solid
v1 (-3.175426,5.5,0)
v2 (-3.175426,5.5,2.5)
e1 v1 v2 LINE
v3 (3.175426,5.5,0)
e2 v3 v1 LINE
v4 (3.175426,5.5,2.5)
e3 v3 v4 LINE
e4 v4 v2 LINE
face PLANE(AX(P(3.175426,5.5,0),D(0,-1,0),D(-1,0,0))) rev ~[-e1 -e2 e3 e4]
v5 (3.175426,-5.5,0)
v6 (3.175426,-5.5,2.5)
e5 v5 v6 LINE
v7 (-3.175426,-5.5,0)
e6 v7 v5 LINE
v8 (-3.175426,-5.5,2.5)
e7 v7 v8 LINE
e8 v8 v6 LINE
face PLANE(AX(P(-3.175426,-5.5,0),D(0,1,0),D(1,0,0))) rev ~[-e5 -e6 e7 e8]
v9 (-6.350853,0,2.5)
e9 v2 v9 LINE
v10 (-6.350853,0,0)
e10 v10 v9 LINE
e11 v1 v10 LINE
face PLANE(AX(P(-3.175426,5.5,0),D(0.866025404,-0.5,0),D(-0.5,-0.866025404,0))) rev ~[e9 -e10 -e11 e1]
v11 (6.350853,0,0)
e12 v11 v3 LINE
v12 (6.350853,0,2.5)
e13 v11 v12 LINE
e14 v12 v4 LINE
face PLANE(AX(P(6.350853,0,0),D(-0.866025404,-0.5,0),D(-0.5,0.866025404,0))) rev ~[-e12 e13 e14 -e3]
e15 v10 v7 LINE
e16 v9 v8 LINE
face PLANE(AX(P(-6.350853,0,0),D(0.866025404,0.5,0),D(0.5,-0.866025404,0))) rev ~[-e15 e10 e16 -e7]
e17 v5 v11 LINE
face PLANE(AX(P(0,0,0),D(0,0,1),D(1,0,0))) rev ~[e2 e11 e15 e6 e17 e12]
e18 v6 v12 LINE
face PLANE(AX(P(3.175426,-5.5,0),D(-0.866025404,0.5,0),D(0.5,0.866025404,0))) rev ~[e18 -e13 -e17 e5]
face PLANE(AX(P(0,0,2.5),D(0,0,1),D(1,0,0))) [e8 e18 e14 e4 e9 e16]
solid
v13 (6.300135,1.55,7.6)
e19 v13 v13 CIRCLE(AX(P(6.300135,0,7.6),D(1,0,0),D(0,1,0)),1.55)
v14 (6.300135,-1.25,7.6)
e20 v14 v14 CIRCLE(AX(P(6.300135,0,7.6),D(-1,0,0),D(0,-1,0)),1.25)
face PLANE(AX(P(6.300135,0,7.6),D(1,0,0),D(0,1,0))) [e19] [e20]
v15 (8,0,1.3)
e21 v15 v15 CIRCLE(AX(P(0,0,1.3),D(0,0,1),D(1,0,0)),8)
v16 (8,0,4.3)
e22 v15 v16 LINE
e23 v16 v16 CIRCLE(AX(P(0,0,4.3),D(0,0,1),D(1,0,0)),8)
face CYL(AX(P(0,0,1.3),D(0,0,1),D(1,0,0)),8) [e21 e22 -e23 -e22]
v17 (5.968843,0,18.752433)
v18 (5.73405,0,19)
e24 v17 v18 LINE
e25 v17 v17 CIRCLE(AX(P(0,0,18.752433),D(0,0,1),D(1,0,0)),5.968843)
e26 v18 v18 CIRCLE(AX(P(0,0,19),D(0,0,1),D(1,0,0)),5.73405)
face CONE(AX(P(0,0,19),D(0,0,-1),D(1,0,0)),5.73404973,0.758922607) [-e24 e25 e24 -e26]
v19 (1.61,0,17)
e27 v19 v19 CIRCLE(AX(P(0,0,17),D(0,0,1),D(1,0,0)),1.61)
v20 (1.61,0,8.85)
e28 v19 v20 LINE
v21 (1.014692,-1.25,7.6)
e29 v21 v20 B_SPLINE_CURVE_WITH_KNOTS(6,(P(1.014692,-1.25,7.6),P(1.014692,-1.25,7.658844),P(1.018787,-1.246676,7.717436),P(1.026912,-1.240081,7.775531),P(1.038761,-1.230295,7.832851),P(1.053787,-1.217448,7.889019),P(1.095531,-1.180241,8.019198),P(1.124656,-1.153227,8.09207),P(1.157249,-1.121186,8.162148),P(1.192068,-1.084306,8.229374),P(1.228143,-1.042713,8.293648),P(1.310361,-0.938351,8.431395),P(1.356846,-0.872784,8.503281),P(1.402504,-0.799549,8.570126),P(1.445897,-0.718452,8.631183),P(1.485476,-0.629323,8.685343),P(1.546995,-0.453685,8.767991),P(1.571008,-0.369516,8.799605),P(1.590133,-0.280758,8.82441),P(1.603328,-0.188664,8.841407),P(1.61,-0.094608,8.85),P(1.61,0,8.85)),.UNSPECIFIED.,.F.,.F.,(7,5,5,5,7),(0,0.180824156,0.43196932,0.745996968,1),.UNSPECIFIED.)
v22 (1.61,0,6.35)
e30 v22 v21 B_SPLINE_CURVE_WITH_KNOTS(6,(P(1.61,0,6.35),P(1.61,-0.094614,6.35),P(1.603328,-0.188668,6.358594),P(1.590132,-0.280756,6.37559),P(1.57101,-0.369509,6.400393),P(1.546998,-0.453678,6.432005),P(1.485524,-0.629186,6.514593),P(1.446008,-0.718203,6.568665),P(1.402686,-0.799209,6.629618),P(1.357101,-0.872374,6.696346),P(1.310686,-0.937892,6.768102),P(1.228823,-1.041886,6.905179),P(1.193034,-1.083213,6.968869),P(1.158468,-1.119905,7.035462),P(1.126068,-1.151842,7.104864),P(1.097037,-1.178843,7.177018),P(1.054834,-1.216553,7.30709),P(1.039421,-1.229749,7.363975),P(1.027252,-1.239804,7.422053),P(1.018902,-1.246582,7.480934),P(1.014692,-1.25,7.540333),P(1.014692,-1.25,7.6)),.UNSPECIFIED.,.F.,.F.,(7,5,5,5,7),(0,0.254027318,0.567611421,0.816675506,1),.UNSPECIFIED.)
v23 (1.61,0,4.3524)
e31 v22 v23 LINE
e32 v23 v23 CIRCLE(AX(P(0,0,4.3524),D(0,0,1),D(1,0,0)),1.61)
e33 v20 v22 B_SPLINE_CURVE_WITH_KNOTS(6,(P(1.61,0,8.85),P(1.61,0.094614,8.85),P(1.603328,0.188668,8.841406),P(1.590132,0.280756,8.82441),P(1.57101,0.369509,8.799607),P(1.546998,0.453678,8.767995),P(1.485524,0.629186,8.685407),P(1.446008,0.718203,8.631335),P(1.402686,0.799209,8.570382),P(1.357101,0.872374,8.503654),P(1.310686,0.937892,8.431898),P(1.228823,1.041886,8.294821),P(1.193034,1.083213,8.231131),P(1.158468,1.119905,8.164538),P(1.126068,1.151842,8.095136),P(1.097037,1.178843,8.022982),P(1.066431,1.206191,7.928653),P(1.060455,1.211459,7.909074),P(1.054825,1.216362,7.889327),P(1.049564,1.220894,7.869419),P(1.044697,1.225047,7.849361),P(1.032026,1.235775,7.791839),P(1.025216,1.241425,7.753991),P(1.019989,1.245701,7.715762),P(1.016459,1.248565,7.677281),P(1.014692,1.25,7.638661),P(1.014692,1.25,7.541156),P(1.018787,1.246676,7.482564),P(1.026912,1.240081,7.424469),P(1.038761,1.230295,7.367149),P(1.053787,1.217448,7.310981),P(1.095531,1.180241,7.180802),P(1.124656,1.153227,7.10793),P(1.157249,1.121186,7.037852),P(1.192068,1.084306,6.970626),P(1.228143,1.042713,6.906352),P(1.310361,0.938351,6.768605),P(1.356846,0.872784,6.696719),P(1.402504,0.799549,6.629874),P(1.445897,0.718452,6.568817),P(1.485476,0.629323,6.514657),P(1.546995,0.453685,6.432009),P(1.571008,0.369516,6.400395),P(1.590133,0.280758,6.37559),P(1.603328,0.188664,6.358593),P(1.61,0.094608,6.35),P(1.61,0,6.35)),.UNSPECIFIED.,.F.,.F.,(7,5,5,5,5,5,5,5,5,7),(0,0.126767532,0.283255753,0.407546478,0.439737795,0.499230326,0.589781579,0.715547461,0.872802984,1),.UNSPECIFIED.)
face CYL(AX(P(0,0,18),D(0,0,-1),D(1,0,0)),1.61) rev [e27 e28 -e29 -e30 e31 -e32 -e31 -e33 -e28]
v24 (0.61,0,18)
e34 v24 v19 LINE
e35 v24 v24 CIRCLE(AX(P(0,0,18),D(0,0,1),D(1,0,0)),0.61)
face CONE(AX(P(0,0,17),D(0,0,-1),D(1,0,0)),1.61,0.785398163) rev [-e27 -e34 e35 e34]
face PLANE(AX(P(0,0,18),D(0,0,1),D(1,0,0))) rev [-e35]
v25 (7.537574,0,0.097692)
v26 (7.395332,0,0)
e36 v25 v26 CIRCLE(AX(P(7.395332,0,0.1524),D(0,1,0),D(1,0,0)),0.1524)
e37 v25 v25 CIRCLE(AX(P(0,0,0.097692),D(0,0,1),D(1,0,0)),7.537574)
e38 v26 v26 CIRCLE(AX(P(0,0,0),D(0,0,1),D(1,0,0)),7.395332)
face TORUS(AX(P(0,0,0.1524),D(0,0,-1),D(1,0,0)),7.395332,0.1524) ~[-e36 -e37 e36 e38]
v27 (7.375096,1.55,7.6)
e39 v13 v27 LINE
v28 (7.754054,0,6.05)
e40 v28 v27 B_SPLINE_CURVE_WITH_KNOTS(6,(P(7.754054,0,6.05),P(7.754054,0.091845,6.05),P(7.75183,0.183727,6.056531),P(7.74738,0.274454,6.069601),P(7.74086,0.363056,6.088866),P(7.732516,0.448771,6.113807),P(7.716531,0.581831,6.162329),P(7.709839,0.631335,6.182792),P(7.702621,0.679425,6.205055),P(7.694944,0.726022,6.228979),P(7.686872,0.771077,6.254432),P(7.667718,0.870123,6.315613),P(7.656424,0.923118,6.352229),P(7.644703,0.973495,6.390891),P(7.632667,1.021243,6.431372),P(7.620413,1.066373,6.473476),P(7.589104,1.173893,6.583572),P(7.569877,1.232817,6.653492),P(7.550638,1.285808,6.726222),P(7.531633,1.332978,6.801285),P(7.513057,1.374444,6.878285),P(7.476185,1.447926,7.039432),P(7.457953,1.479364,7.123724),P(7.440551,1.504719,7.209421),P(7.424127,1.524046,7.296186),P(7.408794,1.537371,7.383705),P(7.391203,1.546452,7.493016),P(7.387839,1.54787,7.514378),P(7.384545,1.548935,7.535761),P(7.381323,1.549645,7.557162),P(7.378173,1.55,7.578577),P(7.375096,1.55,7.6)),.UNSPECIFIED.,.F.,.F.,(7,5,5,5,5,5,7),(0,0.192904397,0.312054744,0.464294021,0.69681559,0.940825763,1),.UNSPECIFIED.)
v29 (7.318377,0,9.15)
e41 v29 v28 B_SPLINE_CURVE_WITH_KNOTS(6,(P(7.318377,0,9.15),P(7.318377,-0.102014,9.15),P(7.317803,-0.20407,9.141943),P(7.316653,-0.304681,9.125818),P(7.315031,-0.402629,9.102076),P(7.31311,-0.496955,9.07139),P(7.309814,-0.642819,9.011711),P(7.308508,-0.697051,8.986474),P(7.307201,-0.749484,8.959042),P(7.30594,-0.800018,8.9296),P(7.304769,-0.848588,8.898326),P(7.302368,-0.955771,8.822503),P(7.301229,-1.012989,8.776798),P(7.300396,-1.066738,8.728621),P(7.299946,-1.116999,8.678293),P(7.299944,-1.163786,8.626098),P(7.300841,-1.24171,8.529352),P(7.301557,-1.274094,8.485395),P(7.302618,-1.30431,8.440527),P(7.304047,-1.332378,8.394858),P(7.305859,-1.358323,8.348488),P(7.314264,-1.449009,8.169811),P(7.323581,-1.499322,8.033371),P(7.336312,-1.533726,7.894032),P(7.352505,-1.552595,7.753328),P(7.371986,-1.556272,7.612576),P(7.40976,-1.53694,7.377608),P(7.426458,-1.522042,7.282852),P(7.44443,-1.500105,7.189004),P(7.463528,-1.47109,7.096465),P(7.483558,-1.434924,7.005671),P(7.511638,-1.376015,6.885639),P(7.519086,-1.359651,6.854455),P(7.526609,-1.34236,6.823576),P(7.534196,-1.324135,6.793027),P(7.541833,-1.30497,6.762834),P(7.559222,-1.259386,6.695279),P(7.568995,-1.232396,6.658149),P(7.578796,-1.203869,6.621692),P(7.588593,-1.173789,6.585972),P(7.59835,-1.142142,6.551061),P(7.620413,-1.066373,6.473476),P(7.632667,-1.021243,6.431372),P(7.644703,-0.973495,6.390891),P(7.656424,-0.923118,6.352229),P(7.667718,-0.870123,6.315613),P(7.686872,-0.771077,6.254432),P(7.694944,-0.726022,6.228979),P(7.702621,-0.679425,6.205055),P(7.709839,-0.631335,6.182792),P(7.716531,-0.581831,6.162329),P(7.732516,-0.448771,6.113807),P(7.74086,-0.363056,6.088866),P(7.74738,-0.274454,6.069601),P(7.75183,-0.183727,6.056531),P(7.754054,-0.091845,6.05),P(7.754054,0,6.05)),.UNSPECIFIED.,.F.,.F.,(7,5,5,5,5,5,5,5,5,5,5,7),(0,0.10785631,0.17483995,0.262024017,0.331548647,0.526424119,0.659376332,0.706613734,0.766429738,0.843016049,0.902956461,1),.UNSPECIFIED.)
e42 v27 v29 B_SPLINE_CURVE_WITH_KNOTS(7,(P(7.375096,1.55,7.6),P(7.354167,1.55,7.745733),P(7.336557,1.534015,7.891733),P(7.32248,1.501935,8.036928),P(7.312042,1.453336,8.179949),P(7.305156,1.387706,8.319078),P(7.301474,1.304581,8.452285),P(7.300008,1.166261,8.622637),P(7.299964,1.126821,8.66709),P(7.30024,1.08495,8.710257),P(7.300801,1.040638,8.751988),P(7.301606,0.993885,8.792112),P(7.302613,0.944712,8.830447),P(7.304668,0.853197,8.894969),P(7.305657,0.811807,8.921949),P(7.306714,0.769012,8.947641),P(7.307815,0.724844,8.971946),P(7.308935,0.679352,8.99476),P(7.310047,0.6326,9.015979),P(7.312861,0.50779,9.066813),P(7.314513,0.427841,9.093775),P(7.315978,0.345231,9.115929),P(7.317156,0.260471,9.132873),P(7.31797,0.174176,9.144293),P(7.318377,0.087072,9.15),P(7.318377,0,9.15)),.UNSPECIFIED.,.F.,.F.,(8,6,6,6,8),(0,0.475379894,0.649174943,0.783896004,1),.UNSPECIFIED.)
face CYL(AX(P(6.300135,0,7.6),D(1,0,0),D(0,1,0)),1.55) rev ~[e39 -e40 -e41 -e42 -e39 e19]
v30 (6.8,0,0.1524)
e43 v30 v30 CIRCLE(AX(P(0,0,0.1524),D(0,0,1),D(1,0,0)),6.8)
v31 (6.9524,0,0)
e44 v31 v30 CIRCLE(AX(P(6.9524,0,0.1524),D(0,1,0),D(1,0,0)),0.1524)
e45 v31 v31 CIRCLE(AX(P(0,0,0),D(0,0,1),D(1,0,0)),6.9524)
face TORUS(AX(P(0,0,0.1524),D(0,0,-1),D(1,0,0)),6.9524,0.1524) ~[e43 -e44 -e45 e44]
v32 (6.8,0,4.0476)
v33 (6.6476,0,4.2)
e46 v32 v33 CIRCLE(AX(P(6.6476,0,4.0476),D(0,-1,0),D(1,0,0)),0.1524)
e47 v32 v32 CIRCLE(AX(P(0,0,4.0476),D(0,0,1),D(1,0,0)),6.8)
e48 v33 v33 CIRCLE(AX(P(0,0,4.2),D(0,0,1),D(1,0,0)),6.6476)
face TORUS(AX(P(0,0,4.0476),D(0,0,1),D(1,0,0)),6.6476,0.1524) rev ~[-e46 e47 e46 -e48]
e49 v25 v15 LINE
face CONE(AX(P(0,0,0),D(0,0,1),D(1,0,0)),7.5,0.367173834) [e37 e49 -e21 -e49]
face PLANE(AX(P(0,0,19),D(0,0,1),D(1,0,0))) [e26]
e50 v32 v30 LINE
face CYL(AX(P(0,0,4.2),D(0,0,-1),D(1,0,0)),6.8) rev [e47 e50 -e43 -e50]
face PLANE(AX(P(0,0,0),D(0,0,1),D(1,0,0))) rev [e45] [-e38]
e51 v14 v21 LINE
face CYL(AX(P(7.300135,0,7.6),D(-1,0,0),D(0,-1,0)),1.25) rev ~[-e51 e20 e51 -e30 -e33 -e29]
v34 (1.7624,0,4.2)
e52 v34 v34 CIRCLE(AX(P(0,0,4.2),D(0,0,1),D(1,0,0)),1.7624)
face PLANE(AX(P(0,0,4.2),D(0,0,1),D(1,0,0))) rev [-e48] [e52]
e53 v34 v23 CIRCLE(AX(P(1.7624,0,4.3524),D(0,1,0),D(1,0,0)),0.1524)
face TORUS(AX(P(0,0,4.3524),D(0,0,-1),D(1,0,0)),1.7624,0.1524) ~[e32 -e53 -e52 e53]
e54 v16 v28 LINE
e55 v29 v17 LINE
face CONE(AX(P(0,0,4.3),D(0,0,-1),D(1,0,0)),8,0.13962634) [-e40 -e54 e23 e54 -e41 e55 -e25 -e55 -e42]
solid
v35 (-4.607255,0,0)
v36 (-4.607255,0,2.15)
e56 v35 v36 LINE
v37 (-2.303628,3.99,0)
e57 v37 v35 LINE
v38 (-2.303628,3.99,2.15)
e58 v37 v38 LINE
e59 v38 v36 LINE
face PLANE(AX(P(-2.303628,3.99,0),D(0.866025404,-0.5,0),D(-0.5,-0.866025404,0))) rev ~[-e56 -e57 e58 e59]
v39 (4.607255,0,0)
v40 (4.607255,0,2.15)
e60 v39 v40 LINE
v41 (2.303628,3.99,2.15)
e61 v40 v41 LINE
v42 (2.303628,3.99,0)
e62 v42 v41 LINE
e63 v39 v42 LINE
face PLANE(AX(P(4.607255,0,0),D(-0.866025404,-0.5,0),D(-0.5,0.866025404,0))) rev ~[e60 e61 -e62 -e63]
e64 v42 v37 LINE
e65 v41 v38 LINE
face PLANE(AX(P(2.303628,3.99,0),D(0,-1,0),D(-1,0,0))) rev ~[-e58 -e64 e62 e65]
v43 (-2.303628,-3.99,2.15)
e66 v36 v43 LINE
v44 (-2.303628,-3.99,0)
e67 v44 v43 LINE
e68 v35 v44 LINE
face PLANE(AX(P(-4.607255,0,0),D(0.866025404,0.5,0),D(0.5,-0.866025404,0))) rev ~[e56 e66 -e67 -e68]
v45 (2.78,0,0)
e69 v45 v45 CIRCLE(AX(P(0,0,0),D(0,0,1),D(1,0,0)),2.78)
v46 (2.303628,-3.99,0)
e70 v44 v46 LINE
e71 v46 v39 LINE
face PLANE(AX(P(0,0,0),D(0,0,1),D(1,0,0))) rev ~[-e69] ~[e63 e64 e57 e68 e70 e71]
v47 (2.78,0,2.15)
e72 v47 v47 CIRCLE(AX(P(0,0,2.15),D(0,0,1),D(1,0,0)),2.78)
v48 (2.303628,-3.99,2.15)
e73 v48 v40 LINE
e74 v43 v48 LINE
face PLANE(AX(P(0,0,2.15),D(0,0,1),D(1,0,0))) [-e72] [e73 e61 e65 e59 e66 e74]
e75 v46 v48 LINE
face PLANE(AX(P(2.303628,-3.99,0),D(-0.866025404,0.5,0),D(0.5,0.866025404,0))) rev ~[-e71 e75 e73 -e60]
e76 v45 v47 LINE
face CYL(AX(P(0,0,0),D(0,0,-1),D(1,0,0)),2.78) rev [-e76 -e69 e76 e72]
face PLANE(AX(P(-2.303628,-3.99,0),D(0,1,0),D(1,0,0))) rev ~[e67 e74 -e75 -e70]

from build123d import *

# Parameters (mm, degrees)
F3_SIZE        = 1
F4_SIZE2       = 0.2
F4_SIZE        = 0.25
F5_R           = 0.1524
F8_D           = 2.5
F8_DEPTH       = 8
F8_START       = 0.6998646
F8_CBORE_D     = 3.1
F8_CBORE_DEPTH = 1
F8_TIP         = 0.7510757738
F9_R           = 2.78
F10_DEPTH      = 2.15
F12_DEPTH      = 2.5


with BuildPart() as f2:
    # F1 (on Front) → F2 (revolve)
    with BuildSketch(Plane.XZ):
        Polygon((6.8, 4.2), (6.8, 0), (7.5, 0), (8, 1.3), (8, 4.3), (5.9340497299, 19), (0, 19), (0, 18), (1.61, 18), (1.61, 4.2), align=None)
    revolve(axis=Axis((0, 0, 11.6), (0, 0, 1)))

    # F3
    f3_edges = [f2.edges().sort_by_distance(p)[0] for p in [
        (-1.61, 0, 18),
    ]]
    chamfer(f3_edges, length=F3_SIZE)

    # F4
    f4_edges = [f2.edges().sort_by_distance(p)[0] for p in [
        (-5.93405, 0, 19),
    ]]
    chamfer(f4_edges, length=F4_SIZE, length2=F4_SIZE2)

    # F5
    f5_edges = [f2.edges().sort_by_distance(p)[0] for p in [
        (-6.8, 0, 0),
        (-7.5, 0, 0),
        (-6.8, 0, 4.2),
        (-1.61, 0, 4.2),
    ]]
    fillet(f5_edges, radius=F5_R)

    # F8
    # its depths count from where the whole tool has entered the part; down to there all is cleared
    with Locations(Plane.YZ.offset(8).offset(-F8_START)):
        with Locations((0, 7.6)):
            CounterBoreHole(F8_D / 2, F8_CBORE_D / 2, F8_CBORE_DEPTH, depth=F8_DEPTH)
            with Locations((0, 0, -(F8_DEPTH + F8_TIP / 2))):  # 118° drill point
                Cone(0, F8_D / 2, F8_TIP, mode=Mode.SUBTRACT)


with BuildPart() as f10:
    # F9 (on Top) → F10 (new body)
    with BuildSketch(Plane.XY):
        Polygon((-2.3036275741, -3.99), (2.3036275741, -3.99), (4.6072551481, 0), (2.3036275741, 3.99), (-2.3036275741, 3.99), (-4.6072551481, 0), align=None)
        Circle(F9_R, mode=Mode.SUBTRACT)
    extrude(amount=F10_DEPTH)


with BuildPart() as f12:
    # F11 (on Top) → F12 (new body)
    with BuildSketch(Plane.XY):
        Polygon((-3.1754264805, -5.5), (3.1754264805, -5.5), (6.3508529611, 0), (3.1754264805, 5.5), (-3.1754264805, 5.5), (-6.3508529611, 0), align=None)
    extrude(amount=F12_DEPTH)


solid = Compound([f2.part, f10.part, f12.part])
